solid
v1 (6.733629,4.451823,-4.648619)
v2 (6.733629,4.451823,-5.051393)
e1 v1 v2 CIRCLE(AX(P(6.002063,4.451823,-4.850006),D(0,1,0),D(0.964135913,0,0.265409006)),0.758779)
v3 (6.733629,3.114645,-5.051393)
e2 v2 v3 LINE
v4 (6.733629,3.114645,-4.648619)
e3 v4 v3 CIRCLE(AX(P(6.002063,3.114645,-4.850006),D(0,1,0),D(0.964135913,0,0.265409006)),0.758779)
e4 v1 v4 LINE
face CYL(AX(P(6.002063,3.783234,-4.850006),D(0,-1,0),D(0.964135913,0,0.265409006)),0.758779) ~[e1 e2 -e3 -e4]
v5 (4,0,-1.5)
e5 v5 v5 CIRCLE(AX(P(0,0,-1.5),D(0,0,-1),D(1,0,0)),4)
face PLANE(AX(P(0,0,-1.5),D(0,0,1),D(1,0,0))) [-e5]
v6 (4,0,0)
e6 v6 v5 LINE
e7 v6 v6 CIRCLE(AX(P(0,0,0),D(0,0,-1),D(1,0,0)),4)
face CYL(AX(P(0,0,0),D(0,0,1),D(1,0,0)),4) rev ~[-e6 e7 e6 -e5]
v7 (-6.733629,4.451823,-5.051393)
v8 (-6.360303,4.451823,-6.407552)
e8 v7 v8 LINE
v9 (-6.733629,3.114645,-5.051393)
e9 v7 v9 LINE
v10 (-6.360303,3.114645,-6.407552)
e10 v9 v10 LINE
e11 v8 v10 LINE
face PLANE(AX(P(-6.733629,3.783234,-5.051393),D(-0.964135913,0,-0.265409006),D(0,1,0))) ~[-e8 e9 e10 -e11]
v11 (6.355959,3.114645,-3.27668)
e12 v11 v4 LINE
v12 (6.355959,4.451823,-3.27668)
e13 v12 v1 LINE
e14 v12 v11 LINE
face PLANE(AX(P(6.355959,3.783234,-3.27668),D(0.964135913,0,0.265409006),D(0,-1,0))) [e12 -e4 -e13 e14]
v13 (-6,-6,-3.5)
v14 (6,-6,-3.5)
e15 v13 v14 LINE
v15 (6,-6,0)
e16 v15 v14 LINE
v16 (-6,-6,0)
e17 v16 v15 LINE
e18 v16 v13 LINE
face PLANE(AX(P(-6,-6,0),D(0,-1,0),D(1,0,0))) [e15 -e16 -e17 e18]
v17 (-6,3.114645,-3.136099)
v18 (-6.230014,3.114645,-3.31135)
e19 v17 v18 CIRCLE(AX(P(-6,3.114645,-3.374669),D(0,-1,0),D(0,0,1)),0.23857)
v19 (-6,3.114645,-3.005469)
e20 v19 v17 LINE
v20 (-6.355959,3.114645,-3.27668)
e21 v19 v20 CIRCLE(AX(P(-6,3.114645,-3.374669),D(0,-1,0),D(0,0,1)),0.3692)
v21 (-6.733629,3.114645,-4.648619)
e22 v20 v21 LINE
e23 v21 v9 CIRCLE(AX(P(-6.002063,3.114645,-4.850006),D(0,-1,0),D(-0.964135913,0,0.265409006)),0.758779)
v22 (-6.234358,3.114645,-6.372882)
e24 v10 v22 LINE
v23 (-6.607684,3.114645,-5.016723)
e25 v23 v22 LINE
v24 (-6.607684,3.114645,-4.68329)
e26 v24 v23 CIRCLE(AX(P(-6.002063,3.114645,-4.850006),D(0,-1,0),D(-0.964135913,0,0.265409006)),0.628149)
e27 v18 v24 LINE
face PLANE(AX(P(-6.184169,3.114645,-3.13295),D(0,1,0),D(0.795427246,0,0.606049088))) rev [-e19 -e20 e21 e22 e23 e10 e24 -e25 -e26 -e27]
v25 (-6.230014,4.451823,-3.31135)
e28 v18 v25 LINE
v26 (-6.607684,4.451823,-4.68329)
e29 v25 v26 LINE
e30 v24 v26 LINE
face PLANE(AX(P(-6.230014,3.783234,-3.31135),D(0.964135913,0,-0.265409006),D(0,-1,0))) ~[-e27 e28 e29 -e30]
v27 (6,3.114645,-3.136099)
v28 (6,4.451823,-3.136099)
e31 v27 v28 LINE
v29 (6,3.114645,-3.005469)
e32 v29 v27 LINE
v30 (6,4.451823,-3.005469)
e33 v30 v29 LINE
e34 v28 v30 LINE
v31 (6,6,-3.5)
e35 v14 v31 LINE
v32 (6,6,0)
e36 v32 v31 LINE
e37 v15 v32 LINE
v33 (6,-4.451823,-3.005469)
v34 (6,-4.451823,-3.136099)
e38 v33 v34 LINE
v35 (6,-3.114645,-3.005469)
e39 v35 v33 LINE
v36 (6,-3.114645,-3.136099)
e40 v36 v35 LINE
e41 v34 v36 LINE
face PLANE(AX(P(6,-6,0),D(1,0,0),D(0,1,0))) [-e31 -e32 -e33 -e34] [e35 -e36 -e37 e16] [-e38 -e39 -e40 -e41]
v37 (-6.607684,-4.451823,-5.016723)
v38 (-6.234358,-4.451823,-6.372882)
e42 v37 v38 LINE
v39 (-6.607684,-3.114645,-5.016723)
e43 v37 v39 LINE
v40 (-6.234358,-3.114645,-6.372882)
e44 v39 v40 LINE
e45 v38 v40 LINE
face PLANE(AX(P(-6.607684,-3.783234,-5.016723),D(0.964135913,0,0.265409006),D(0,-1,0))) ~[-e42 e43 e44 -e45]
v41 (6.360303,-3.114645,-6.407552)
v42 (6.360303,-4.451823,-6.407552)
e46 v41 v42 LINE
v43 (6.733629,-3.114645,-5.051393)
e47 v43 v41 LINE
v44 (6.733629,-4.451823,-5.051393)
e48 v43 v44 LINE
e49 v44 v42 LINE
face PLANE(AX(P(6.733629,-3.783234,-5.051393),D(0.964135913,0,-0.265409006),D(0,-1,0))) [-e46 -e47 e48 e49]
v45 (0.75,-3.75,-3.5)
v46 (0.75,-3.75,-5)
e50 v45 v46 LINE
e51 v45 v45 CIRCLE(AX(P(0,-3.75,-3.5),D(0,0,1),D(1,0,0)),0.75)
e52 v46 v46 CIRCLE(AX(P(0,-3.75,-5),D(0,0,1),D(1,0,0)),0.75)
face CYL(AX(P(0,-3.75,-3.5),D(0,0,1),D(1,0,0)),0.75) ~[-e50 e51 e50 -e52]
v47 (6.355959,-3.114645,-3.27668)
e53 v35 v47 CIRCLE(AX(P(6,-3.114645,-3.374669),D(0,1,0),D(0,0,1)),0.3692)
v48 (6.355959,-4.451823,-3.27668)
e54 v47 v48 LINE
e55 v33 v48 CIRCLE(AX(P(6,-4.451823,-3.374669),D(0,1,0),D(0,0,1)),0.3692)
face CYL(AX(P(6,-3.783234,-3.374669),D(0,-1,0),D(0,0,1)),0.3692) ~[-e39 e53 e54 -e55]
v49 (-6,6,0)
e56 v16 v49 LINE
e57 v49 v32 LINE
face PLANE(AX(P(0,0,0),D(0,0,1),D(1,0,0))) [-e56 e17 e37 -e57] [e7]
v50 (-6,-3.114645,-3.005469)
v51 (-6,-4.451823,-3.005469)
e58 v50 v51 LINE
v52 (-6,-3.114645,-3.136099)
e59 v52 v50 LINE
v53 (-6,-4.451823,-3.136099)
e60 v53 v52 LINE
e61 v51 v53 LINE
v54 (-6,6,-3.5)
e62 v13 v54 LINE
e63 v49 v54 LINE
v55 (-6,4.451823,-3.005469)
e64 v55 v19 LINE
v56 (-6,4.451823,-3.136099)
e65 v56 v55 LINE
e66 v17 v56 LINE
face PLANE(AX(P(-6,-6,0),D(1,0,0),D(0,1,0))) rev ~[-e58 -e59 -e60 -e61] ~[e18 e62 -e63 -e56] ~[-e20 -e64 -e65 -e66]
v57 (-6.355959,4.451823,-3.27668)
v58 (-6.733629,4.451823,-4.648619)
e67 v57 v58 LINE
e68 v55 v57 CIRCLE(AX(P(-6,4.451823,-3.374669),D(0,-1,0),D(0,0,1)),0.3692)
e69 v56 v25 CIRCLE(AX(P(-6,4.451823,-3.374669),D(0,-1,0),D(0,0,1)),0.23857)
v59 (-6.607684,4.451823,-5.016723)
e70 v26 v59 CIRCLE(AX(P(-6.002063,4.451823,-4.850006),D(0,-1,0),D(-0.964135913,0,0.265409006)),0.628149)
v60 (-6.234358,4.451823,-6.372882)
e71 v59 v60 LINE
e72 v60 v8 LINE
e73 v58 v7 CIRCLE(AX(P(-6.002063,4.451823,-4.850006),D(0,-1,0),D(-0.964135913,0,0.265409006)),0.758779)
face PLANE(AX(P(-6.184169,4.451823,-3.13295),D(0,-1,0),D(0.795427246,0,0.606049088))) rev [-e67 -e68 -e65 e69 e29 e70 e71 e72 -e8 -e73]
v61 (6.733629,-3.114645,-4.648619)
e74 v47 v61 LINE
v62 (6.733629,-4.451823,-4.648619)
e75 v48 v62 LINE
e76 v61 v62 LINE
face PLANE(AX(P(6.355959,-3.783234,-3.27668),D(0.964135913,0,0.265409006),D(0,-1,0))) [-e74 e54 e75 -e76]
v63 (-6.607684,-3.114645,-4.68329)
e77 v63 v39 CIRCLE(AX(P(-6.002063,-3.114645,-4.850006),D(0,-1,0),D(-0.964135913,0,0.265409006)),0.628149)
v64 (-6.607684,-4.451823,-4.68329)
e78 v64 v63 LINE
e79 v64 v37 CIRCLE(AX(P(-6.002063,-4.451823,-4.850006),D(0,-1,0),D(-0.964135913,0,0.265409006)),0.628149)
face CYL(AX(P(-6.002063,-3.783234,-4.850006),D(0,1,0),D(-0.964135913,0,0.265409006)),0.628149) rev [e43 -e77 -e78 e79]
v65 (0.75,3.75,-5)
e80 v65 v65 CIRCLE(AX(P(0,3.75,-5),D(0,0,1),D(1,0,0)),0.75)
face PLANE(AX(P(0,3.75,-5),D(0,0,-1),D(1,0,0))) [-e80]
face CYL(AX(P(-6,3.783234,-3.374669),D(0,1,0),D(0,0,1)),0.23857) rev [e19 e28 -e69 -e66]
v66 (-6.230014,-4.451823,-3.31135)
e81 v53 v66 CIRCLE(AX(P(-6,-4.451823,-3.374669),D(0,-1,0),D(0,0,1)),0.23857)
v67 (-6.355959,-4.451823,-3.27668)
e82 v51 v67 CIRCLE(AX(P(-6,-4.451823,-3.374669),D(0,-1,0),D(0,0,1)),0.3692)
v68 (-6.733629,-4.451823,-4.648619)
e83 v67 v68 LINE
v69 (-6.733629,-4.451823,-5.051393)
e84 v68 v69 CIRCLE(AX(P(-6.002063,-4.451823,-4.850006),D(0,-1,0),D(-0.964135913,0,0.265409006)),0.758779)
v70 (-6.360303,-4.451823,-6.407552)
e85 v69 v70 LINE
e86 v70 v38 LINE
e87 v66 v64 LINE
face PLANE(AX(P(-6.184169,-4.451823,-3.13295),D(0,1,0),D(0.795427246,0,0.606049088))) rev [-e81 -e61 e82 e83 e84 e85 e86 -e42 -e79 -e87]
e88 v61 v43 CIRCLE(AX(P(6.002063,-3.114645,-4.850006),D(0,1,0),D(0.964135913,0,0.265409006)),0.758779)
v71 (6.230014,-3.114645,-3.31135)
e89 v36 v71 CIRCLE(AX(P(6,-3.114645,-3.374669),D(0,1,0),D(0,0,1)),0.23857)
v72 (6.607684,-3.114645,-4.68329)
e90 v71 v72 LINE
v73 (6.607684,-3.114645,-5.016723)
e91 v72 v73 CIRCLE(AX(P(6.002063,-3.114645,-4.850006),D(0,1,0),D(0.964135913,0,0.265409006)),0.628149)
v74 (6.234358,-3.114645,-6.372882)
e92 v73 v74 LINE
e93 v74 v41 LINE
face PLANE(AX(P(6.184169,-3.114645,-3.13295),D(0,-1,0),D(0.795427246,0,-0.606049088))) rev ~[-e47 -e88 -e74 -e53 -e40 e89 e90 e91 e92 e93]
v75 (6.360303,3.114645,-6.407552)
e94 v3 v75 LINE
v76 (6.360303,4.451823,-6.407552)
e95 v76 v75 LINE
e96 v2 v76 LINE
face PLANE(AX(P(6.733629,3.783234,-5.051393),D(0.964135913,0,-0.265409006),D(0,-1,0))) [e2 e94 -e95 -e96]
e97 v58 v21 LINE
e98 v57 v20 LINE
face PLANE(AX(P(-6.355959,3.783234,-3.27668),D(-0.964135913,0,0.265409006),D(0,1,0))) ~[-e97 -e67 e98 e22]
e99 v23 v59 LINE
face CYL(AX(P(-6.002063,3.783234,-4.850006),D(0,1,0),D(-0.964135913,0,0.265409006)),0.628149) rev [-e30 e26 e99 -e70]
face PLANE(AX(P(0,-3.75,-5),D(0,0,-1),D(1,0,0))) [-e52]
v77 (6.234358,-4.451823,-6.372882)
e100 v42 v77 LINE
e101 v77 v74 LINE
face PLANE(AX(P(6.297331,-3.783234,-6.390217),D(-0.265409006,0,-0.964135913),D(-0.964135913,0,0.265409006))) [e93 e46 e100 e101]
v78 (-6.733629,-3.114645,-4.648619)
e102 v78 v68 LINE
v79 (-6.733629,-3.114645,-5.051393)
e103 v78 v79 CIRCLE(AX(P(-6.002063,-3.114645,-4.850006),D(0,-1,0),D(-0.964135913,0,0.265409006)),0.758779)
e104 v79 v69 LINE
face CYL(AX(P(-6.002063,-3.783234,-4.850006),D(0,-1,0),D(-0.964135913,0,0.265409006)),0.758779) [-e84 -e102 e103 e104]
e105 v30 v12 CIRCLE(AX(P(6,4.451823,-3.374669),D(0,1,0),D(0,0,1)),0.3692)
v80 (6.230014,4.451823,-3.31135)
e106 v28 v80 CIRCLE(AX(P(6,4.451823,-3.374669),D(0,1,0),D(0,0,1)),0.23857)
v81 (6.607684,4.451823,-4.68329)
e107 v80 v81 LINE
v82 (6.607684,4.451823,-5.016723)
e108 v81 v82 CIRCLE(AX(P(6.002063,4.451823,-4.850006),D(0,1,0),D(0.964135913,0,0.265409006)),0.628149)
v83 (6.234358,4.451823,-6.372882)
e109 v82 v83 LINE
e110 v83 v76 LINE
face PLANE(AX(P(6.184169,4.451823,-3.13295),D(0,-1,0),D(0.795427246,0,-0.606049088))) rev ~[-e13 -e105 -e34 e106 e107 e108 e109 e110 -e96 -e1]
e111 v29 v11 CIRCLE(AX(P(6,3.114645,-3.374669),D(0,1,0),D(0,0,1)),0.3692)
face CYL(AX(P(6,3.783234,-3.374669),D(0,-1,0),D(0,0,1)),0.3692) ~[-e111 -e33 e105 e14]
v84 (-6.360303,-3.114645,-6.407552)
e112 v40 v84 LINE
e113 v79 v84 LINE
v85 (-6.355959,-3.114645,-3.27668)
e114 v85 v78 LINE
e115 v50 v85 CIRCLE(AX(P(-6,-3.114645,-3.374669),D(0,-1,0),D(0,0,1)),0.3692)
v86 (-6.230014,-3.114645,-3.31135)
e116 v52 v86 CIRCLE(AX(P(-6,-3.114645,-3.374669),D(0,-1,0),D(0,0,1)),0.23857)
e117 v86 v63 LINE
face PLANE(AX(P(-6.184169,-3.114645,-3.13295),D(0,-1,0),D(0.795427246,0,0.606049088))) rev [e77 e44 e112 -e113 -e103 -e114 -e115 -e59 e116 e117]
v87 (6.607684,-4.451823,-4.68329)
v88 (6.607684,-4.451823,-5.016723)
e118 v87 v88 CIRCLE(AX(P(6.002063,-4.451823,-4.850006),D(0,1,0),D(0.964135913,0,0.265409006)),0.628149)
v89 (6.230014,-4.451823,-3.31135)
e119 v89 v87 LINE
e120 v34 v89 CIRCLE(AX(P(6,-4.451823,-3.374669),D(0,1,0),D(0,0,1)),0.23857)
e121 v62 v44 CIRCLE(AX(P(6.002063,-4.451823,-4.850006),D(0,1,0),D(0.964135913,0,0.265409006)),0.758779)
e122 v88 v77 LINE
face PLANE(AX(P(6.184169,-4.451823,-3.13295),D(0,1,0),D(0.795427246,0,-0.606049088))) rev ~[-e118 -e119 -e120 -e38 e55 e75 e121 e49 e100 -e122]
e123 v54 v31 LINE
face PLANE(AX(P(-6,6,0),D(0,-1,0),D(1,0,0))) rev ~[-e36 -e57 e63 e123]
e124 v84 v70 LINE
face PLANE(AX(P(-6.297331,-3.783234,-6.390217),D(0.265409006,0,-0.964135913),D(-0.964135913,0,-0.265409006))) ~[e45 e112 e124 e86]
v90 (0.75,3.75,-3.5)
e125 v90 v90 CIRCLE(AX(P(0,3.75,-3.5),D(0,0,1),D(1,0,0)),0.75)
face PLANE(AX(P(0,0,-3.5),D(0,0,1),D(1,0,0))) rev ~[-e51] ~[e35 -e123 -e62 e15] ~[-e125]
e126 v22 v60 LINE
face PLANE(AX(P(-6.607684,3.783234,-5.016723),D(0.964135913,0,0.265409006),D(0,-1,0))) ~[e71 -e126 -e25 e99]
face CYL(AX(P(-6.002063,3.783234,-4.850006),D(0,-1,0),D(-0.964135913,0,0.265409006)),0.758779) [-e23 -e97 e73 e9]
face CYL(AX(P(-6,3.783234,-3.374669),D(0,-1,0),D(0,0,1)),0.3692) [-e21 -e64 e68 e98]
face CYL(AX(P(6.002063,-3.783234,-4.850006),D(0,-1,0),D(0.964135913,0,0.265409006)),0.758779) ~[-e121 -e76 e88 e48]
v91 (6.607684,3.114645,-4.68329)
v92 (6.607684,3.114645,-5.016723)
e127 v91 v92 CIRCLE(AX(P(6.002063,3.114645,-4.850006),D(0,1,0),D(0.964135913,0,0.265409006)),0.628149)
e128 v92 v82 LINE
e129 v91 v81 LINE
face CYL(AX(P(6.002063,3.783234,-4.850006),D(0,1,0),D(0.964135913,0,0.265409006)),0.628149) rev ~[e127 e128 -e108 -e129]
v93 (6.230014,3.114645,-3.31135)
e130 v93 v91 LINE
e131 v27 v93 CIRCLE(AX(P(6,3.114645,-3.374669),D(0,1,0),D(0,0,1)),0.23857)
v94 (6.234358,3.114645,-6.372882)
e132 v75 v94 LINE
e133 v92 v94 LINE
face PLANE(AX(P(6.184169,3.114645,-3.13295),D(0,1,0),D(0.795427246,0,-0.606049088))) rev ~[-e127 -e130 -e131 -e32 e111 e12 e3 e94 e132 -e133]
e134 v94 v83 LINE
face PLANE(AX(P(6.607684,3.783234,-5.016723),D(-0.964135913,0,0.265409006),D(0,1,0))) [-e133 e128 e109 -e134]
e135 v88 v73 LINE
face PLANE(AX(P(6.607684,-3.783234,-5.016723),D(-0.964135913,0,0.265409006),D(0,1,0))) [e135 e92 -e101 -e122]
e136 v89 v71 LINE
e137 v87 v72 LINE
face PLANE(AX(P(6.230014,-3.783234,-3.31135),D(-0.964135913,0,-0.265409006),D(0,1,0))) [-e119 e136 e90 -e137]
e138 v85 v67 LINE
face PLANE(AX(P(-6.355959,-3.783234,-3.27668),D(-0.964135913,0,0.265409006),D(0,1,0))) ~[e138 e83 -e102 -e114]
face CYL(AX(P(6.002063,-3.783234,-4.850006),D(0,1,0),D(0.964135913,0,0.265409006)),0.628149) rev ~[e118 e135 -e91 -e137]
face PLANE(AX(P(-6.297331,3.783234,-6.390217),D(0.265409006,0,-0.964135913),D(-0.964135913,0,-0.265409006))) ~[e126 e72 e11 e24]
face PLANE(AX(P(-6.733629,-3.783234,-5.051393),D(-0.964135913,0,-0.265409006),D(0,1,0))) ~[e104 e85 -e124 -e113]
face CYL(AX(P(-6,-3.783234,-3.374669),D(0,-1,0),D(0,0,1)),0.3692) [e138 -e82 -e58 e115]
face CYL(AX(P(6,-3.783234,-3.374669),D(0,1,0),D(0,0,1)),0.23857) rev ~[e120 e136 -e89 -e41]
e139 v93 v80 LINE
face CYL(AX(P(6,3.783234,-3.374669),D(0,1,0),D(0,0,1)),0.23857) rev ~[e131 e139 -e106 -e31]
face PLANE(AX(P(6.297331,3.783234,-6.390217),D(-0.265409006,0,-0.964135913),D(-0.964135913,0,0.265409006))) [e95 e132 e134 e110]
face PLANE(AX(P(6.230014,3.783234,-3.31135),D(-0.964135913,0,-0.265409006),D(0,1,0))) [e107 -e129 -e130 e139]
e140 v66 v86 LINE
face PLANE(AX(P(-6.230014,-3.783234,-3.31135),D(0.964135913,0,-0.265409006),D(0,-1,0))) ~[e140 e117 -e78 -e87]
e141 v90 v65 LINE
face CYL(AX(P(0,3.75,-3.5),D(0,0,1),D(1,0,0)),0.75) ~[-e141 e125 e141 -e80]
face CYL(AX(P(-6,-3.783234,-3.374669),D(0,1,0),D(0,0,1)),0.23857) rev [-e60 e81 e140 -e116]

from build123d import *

# Parameters (mm, degrees)
F0_W     = 12
F0_H     = 12
F1_DEPTH = 3.5
F2_R     = 4
F3_DEPTH = 1.5
F4_R     = 0.75
F5_DEPTH = 1.5
F6_W     = 1.3371782843
F6_H     = 0.1306298655


with BuildPart() as f1:
    # F0 (on Top) → F1 (new body)
    with BuildSketch(Plane.XY):
        Rectangle(F0_W, F0_H)
    extrude(amount=-F1_DEPTH)

    # F2 (on Top) → F3 (cut)
    with BuildSketch(Plane.XY):
        Circle(F2_R)
    extrude(amount=-F3_DEPTH, mode=Mode.SUBTRACT)

    # F4 (on face) → F5 (join)
    with BuildSketch(Plane(origin=(0, 0, -3.5), x_dir=(1, 0, 0), z_dir=(0, 0, -1))):
        with Locations((0, -3.75)):
            Circle(F4_R)
        with Locations((0, 3.75)):
            Circle(F4_R)
    extrude(amount=F5_DEPTH)

    # F8: sweep along a path in F7
    with BuildLine(Plane(origin=(0, 6, 0), x_dir=(-1, 0, 0), z_dir=(0, 1, 0))) as f8_path:
        ThreePointArc((-6, -2.9808722661), (-6.2386599526, -3.0614322815), (-6.3796732575, -3.2701515593))
        Line((-6.3796732575, -3.2701515593), (-6.7573431879, -4.6420912258))
        ThreePointArc((-6.7573431879, -4.6420912258), (-6.7854382425, -4.8500061966), (-6.7573431879, -5.0579211675))
        Line((-6.7573431879, -5.0579211675), (-6.3840173786, -6.4140801969))
    # F6 (on face) → F8 (sweep)
    with BuildSketch(Plane.YZ.offset(6)):
        with Locations((-3.7832342787, -3.070783685)):
            Rectangle(F6_W, F6_H)
        with Locations((3.7832342787, -3.070783685)):
            Rectangle(F6_W, F6_H)
    sweep(path=f8_path.line)

    # F9: F1 across plane


with BuildPart() as f1_1:
    add(f1.part)
    add(f1.part.mirror(Plane.YZ))


solid = f1_1.part
